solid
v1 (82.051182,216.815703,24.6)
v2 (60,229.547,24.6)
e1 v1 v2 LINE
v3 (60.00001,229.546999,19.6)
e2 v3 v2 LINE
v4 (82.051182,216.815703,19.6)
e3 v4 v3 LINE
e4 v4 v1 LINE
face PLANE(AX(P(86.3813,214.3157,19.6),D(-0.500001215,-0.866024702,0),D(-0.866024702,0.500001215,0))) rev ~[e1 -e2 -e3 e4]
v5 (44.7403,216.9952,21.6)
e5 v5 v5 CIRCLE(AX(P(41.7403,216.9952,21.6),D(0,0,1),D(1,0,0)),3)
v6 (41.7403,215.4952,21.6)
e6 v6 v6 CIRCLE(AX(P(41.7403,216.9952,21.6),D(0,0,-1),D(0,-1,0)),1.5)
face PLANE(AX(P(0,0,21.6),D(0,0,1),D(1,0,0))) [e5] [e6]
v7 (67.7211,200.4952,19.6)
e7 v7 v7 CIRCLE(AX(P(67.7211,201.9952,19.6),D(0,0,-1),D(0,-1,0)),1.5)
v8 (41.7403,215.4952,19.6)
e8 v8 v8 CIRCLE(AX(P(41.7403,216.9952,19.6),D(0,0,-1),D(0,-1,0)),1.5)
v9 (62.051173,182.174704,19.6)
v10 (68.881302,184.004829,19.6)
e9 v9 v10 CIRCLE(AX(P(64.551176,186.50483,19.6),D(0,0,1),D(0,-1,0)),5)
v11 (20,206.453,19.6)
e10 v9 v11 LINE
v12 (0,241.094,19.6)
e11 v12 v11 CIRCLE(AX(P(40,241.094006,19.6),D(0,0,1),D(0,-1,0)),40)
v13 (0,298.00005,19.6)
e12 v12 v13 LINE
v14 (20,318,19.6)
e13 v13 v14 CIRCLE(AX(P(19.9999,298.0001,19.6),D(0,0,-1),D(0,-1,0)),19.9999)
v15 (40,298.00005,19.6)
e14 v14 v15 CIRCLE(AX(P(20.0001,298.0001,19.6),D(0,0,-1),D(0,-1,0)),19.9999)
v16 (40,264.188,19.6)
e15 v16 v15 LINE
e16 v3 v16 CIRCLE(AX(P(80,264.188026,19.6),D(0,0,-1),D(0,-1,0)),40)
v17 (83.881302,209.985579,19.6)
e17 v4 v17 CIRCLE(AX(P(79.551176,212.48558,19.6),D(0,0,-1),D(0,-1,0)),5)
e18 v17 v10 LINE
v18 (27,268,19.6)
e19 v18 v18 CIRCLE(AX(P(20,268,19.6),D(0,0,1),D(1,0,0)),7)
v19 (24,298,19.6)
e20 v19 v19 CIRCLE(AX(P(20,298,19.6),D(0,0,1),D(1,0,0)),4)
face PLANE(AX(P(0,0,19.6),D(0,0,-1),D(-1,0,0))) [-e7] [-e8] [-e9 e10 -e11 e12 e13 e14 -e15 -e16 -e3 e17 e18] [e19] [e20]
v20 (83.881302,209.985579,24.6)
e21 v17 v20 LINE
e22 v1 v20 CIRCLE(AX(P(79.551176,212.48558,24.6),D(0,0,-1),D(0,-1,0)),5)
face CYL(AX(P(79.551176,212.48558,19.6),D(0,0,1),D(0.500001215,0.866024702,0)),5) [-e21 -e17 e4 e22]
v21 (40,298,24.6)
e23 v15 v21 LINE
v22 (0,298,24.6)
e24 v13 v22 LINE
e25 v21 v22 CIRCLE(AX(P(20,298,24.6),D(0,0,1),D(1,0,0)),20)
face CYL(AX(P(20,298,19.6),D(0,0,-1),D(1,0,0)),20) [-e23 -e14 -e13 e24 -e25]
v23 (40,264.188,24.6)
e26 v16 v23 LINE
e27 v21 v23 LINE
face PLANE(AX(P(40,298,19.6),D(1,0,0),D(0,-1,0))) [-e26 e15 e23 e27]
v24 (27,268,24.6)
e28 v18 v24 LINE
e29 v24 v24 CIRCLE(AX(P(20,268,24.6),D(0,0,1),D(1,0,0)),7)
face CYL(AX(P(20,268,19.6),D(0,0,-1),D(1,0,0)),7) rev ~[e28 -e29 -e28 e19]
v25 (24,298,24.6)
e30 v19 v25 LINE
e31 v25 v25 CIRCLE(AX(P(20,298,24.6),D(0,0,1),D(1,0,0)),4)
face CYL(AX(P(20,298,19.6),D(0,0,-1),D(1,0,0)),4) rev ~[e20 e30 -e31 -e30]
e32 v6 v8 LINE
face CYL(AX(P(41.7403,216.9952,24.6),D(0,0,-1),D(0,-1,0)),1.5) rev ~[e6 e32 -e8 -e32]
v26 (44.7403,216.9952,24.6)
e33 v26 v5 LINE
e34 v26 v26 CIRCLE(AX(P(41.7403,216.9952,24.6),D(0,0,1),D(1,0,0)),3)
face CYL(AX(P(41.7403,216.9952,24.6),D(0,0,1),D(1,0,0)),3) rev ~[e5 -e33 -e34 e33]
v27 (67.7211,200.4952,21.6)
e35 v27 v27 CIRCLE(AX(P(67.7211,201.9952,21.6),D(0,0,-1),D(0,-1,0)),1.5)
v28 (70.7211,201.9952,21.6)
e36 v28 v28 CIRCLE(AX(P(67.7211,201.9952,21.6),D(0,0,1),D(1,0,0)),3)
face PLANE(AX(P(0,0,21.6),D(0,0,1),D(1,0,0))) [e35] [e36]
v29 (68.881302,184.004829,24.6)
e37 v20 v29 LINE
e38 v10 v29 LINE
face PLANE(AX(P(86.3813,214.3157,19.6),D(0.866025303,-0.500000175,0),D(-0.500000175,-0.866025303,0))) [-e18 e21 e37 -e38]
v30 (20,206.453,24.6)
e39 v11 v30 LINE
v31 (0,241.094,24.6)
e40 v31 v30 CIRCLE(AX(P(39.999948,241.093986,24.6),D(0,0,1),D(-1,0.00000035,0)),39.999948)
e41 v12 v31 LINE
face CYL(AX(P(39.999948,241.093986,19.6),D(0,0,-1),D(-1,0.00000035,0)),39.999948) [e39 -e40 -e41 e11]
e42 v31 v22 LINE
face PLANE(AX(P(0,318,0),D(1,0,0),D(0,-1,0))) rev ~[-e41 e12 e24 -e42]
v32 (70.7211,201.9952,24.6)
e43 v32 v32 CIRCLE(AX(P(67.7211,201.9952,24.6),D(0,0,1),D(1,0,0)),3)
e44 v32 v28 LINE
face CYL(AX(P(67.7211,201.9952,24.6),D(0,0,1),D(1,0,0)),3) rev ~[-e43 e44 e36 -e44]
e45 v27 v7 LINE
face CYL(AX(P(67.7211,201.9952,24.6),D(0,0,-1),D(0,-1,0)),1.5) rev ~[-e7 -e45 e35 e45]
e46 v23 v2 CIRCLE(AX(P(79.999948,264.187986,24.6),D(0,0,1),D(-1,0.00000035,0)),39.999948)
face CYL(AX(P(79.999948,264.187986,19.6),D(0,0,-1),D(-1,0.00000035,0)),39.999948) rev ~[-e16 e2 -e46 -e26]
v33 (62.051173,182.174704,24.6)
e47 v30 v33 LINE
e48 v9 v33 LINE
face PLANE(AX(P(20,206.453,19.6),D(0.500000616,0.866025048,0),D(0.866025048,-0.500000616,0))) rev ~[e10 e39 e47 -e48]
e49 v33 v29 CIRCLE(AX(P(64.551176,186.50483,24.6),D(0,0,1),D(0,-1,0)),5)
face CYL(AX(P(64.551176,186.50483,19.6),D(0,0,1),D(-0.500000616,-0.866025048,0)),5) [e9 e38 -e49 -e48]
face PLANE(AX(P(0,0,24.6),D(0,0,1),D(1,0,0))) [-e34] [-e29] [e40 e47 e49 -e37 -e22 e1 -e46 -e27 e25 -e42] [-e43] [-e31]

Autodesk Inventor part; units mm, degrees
ref_plane "YZ Plane" through (0, 0, 0) normal (1, 0, 0) x (0, 1, 0)
ref_plane "XZ Plane" through (0, 0, 0) normal (0, 1, 0) x (-1, 0, 0)
ref_plane "XY Plane" through (0, 0, 0) normal (0, 0, 1) x (1, 0, 0)
sketch "スケッチ1" plane through (0, 0, 0) normal (0, 0, 1) x (1, 0, 0)
  line L0 (0, 0) -> (40, 0)
  line L1 (40, 0) -> (40, 318)
  line L2 (40, 318) -> (0, 318)
  line L3 (0, 318) -> (0, 0)
  line L4 (0, 218) -> (112.7627, 152.8964)
  line L5 (112.7627, 152.8964) -> (132.7627, 187.5375)
  line L6 (132.7627, 187.5375) -> (40, 241.094)
  point P0 (40, 218)
  point P1 (40, 194.906)
  point P2 (20, 318)
  point P3 (122.7627, 170.2169)
  point P4 (20, 258)
  dimension "d0" = 40
  dimension "d1" = 318
  dimension "d69" = 40
  dimension "d70" = 60
  dimension "d91" = 20
  dimension "d92" = 100
  dimension "d93" = 180
  dimension "d96" = 20
  dimension "d97" = 60
extrude "押し出し1" add sketch "スケッチ1" along normal blind 19.6 contours L3 L2 L1 L4 | L1 L6 L5 L4
sketch "スケッチ6" plane through (0, 0, 19.6) normal (0, 0, 1) x (1, 0, 0)
  circle A0 centre (20, 268) radius 7
  line L0 (40, 318) -> (0, 318) projected
  line L1 (40, 241.094) -> (40, 318) projected
  circle A1 centre (20, 20) radius 1.2295
  circle A2 centre (20, 10) radius 1.2295
  line L2 (0, 0) -> (40, 0) projected
  circle A3 centre (20, 298) radius 4
  point P0 (20, 318)
  point P1 (40, 190.8114)
  point P2 (30, 0)
  dimension "d42" = 14
  dimension "d44" = 20
  dimension "d45" = 2.459
  dimension "d46" = 2.459
  dimension "d47" = 10
  dimension "d48" = 10
  dimension "d49" = 20
  dimension "d50" = 20
  dimension "d53" = 8
  dimension "d54" = 20
  dimension "d55" = 30
  dimension "d56" = 20
extrude "押し出し4" cut sketch "スケッチ6" against normal through all contours A0 | A3
sketch "スケッチ8" plane through (0, 0, 0) normal (-1, 0, 0) x (0, 0, 1)
  line L0 (0, 318) -> (19.6, 318) projected
  line L1 (5, 318) -> (14.6, 318)
  line L2 (14.6, 318) -> (14.6, 278)
  line L3 (14.6, 278) -> (5, 278)
  line L4 (5, 278) -> (5, 318)
  line L5 (0, 318) -> (0, 0) projected
  dimension "d57" = 5
  dimension "d58" = 9.6
  dimension "d59" = 40
  dimension "d98" = 19.6
extrude "押し出し5" cut sketch "スケッチ8" against normal through all
fillet "フィレット1" radius 20 4 edges at (40, 318, 17.1) (40, 318, 2.5) (0, 318, 2.5) (0, 318, 17.1)
fillet "フィレット2" radius 40 2 edges at (0, 218, 9.8) (40, 241.094, 9.8)
sketch "スケッチ9" plane through (0, 0, 19.6) normal (0, 0, 1) x (1, 0, 0)
  line L0 (20, 206.453) -> (112.7627, 152.8964) projected
  line L1 (132.7627, 187.5375) -> (60, 229.547) projected
  line L2 (112.7627, 152.8964) -> (132.7627, 187.5375) projected
  line L3 (132.7627, 187.5375) -> (112.7627, 152.8964)
  line L4 (66.3813, 179.6747) -> (112.7627, 152.8964)
  line L5 (132.7627, 187.5375) -> (166.773, 167.9016)
  line L6 (115.1204, 126.9801) -> (133.5174, 158.8446)
  line L7 (141.7531, 173.1092) -> (128.7627, 180.6092)
  line L8 (112.7627, 152.8964) -> (20, 206.453)
  line L9 (132.7627, 187.5375) -> (60, 229.547)
  line L10 (115.1204, 126.9801) -> (125.7531, 145.3964)
  line L11 (133.5174, 158.8446) -> (145.7531, 180.0375)
  line L12 (116.7627, 159.8246) -> (129.7531, 152.3246)
  line L13 (66.3813, 179.6747) -> (129.7531, 152.3246)
  line L14 (66.3813, 179.6747) -> (86.3813, 214.3157)
  line L15 (86.3813, 214.3157) -> (141.7531, 173.1092)
  point P0 (0, 0)
  point P1 (254.4532, 80.329)
  point P2 (128.7627, 180.6092)
  point P3 (123.2579, 156.0746)
  point P4 (86.3813, 214.3157)
  point P5 (40, 194.906)
  point P6 (115.8875, 158.3088)
  point P7 (129.6379, 182.1251)
  dimension "d80" = 24
  dimension "d81" = 40
  dimension "d83" = 15
  dimension "d84" = 8
  dimension "d90" = 24
extrude "押し出し6" cut sketch "スケッチ9" against normal through all contours L13 L2 L0 | L1 L2 L15
sketch "スケッチ11" plane through (104.9897, 139.4332, 24) normal (0.8660254, -0.5, 0) x (0, 0, -1)
  line L0 (4.4, 21.7957) -> (4.4, 49.2964) projected
  line L1 (24, 21.7957) -> (24, 49.2964) projected
  line L2 (0, 24) -> (24, 24)
  line L3 (24, 24) -> (24, 0)
  line L4 (24, 0) -> (0, 0)
  line L5 (0, 0) -> (0, 24)
  line L6 (17, 17) -> (7, 17)
  line L7 (7, 17) -> (7, 7)
  line L8 (7, 7) -> (17, 7)
  line L9 (17, 7) -> (17, 17)
  line L10 (4.4, 35.546) -> (24, 35.546) projected
  circle A0 centre (14.2, 35.546) radius 5
  point P0 (24, -173.2475)
  point P1 (24, 24)
  point P2 (0, 15.546)
  point P3 (24, 15.546)
  dimension "d85" = 10
  dimension "d88" = 10
extrude "押し出し7" add sketch "スケッチ11" along normal blind 15 contours A0 L10 | L10 A0
fillet "フィレット4" radius 20 2 edges at (0, 278, 9.8) (40, 278, 9.8)
sketch "スケッチ12" plane through (0, 0, 19.6) normal (0, 0, 1) x (1, 0, 0)
  line L0 (0, 340.2847) -> (40, 340.2847)
  line L1 (40, 340.2847) -> (40, 181.2581)
  line L2 (40, 181.2581) -> (0, 181.2581)
  line L3 (0, 181.2581) -> (0, 340.2847)
  line L4 (40, 264.188) -> (40, 298) projected
  arc A0 (40, 298) -> (0, 298) centre (20, 298) ccw
  arc A1 (40, 264.188) -> (60, 229.547) centre (80, 264.188) ccw projected
  line L5 (60, 229.547) -> (40, 194.906)
  line L6 (20, 206.453) -> (66.3813, 179.6747) projected
  arc A2 (0, 241.094) -> (20, 206.453) centre (40, 241.094) ccw projected
  arc A3 (0, 241.094) -> (20, 206.453) centre (40, 241.094) ccw
  line L7 (20, 206.453) -> (40, 194.906)
  line L8 (86.3813, 214.3157) -> (60, 229.547) projected
  line L9 (60, 229.547) -> (86.3813, 214.3157)
  line L10 (86.3813, 214.3157) -> (66.3813, 179.6747)
  line L11 (40, 194.906) -> (66.3813, 179.6747)
  circle A4 centre (20, 298) radius 4
  circle A5 centre (20, 268) radius 7 projected
  circle A6 centre (20, 268) radius 4
  point P0 (0, 0)
  dimension "d99" = 40
  dimension "d100" = 40
extrude "押し出し8" add sketch "スケッチ12" along normal blind 5 contours A0 L1 L6 A2 L3 | A1 L5 L1 | L5 L8 L10 L6
sketch "スケッチ13" plane through (0, 0, 0) normal (0, 0, -1) x (-1, 0, 0)
  line L0 (-253.843, 397.4333) -> (123.9074, 397.4333)
  line L1 (123.9074, 397.4333) -> (123.9074, 95.9261)
  line L2 (123.9074, 95.9261) -> (-253.843, 95.9261)
  line L3 (-253.843, 95.9261) -> (-253.843, 397.4333)
  point P0 (0, 0)
extrude "押し出し9" cut sketch "スケッチ13" against normal blind 19.6
sketch "スケッチ14" plane through (0, 0, 24.6) normal (0, 0, 1) x (1, 0, 0)
  line L0 (20, 206.453) -> (66.3813, 179.6747) projected
  line L1 (66.3813, 179.6747) -> (86.3813, 214.3157) projected
  line L2 (41.7403, 216.9952) -> (76.3813, 196.9952)
  point P0 (0, 0)
  point P1 (67.7211, 201.9952)
  dimension "d105" = 20
  dimension "d106" = 20
  dimension "d107" = 30
  dimension "d108" = 10
hole "穴3" at (41.7403, 216.9952, 24.6) at (67.7211, 201.9952, 24.6) direction (0, 0, -1) diameter 3 end through all
fillet "フィレット5" radius 5 2 edges at (86.3813, 214.3157, 22.1) (66.3813, 179.6747, 22.1)
sketch "スケッチ15" plane through (0, 0, 24.6) normal (0, 0, 1) x (1, 0, 0)
  circle A0 centre (41.7403, 216.9952) radius 1.5 projected
  circle A1 centre (41.7403, 216.9952) radius 3
  circle A2 centre (67.7211, 201.9952) radius 1.5 projected
  circle A3 centre (67.7211, 201.9952) radius 3
  point P0 (0, 0)
  dimension "d117" = 6
  dimension "d118" = 6
extrude "押し出し10" cut sketch "スケッチ15" against normal blind 3
equation "\"d45\" = d46"
equation "\"d48\" = d47"
equation "\"d50\" = d49"
equation "\"d106\" = d105"
properties part number "BR_parts_06(1)" material "アルミニウム 6061"
